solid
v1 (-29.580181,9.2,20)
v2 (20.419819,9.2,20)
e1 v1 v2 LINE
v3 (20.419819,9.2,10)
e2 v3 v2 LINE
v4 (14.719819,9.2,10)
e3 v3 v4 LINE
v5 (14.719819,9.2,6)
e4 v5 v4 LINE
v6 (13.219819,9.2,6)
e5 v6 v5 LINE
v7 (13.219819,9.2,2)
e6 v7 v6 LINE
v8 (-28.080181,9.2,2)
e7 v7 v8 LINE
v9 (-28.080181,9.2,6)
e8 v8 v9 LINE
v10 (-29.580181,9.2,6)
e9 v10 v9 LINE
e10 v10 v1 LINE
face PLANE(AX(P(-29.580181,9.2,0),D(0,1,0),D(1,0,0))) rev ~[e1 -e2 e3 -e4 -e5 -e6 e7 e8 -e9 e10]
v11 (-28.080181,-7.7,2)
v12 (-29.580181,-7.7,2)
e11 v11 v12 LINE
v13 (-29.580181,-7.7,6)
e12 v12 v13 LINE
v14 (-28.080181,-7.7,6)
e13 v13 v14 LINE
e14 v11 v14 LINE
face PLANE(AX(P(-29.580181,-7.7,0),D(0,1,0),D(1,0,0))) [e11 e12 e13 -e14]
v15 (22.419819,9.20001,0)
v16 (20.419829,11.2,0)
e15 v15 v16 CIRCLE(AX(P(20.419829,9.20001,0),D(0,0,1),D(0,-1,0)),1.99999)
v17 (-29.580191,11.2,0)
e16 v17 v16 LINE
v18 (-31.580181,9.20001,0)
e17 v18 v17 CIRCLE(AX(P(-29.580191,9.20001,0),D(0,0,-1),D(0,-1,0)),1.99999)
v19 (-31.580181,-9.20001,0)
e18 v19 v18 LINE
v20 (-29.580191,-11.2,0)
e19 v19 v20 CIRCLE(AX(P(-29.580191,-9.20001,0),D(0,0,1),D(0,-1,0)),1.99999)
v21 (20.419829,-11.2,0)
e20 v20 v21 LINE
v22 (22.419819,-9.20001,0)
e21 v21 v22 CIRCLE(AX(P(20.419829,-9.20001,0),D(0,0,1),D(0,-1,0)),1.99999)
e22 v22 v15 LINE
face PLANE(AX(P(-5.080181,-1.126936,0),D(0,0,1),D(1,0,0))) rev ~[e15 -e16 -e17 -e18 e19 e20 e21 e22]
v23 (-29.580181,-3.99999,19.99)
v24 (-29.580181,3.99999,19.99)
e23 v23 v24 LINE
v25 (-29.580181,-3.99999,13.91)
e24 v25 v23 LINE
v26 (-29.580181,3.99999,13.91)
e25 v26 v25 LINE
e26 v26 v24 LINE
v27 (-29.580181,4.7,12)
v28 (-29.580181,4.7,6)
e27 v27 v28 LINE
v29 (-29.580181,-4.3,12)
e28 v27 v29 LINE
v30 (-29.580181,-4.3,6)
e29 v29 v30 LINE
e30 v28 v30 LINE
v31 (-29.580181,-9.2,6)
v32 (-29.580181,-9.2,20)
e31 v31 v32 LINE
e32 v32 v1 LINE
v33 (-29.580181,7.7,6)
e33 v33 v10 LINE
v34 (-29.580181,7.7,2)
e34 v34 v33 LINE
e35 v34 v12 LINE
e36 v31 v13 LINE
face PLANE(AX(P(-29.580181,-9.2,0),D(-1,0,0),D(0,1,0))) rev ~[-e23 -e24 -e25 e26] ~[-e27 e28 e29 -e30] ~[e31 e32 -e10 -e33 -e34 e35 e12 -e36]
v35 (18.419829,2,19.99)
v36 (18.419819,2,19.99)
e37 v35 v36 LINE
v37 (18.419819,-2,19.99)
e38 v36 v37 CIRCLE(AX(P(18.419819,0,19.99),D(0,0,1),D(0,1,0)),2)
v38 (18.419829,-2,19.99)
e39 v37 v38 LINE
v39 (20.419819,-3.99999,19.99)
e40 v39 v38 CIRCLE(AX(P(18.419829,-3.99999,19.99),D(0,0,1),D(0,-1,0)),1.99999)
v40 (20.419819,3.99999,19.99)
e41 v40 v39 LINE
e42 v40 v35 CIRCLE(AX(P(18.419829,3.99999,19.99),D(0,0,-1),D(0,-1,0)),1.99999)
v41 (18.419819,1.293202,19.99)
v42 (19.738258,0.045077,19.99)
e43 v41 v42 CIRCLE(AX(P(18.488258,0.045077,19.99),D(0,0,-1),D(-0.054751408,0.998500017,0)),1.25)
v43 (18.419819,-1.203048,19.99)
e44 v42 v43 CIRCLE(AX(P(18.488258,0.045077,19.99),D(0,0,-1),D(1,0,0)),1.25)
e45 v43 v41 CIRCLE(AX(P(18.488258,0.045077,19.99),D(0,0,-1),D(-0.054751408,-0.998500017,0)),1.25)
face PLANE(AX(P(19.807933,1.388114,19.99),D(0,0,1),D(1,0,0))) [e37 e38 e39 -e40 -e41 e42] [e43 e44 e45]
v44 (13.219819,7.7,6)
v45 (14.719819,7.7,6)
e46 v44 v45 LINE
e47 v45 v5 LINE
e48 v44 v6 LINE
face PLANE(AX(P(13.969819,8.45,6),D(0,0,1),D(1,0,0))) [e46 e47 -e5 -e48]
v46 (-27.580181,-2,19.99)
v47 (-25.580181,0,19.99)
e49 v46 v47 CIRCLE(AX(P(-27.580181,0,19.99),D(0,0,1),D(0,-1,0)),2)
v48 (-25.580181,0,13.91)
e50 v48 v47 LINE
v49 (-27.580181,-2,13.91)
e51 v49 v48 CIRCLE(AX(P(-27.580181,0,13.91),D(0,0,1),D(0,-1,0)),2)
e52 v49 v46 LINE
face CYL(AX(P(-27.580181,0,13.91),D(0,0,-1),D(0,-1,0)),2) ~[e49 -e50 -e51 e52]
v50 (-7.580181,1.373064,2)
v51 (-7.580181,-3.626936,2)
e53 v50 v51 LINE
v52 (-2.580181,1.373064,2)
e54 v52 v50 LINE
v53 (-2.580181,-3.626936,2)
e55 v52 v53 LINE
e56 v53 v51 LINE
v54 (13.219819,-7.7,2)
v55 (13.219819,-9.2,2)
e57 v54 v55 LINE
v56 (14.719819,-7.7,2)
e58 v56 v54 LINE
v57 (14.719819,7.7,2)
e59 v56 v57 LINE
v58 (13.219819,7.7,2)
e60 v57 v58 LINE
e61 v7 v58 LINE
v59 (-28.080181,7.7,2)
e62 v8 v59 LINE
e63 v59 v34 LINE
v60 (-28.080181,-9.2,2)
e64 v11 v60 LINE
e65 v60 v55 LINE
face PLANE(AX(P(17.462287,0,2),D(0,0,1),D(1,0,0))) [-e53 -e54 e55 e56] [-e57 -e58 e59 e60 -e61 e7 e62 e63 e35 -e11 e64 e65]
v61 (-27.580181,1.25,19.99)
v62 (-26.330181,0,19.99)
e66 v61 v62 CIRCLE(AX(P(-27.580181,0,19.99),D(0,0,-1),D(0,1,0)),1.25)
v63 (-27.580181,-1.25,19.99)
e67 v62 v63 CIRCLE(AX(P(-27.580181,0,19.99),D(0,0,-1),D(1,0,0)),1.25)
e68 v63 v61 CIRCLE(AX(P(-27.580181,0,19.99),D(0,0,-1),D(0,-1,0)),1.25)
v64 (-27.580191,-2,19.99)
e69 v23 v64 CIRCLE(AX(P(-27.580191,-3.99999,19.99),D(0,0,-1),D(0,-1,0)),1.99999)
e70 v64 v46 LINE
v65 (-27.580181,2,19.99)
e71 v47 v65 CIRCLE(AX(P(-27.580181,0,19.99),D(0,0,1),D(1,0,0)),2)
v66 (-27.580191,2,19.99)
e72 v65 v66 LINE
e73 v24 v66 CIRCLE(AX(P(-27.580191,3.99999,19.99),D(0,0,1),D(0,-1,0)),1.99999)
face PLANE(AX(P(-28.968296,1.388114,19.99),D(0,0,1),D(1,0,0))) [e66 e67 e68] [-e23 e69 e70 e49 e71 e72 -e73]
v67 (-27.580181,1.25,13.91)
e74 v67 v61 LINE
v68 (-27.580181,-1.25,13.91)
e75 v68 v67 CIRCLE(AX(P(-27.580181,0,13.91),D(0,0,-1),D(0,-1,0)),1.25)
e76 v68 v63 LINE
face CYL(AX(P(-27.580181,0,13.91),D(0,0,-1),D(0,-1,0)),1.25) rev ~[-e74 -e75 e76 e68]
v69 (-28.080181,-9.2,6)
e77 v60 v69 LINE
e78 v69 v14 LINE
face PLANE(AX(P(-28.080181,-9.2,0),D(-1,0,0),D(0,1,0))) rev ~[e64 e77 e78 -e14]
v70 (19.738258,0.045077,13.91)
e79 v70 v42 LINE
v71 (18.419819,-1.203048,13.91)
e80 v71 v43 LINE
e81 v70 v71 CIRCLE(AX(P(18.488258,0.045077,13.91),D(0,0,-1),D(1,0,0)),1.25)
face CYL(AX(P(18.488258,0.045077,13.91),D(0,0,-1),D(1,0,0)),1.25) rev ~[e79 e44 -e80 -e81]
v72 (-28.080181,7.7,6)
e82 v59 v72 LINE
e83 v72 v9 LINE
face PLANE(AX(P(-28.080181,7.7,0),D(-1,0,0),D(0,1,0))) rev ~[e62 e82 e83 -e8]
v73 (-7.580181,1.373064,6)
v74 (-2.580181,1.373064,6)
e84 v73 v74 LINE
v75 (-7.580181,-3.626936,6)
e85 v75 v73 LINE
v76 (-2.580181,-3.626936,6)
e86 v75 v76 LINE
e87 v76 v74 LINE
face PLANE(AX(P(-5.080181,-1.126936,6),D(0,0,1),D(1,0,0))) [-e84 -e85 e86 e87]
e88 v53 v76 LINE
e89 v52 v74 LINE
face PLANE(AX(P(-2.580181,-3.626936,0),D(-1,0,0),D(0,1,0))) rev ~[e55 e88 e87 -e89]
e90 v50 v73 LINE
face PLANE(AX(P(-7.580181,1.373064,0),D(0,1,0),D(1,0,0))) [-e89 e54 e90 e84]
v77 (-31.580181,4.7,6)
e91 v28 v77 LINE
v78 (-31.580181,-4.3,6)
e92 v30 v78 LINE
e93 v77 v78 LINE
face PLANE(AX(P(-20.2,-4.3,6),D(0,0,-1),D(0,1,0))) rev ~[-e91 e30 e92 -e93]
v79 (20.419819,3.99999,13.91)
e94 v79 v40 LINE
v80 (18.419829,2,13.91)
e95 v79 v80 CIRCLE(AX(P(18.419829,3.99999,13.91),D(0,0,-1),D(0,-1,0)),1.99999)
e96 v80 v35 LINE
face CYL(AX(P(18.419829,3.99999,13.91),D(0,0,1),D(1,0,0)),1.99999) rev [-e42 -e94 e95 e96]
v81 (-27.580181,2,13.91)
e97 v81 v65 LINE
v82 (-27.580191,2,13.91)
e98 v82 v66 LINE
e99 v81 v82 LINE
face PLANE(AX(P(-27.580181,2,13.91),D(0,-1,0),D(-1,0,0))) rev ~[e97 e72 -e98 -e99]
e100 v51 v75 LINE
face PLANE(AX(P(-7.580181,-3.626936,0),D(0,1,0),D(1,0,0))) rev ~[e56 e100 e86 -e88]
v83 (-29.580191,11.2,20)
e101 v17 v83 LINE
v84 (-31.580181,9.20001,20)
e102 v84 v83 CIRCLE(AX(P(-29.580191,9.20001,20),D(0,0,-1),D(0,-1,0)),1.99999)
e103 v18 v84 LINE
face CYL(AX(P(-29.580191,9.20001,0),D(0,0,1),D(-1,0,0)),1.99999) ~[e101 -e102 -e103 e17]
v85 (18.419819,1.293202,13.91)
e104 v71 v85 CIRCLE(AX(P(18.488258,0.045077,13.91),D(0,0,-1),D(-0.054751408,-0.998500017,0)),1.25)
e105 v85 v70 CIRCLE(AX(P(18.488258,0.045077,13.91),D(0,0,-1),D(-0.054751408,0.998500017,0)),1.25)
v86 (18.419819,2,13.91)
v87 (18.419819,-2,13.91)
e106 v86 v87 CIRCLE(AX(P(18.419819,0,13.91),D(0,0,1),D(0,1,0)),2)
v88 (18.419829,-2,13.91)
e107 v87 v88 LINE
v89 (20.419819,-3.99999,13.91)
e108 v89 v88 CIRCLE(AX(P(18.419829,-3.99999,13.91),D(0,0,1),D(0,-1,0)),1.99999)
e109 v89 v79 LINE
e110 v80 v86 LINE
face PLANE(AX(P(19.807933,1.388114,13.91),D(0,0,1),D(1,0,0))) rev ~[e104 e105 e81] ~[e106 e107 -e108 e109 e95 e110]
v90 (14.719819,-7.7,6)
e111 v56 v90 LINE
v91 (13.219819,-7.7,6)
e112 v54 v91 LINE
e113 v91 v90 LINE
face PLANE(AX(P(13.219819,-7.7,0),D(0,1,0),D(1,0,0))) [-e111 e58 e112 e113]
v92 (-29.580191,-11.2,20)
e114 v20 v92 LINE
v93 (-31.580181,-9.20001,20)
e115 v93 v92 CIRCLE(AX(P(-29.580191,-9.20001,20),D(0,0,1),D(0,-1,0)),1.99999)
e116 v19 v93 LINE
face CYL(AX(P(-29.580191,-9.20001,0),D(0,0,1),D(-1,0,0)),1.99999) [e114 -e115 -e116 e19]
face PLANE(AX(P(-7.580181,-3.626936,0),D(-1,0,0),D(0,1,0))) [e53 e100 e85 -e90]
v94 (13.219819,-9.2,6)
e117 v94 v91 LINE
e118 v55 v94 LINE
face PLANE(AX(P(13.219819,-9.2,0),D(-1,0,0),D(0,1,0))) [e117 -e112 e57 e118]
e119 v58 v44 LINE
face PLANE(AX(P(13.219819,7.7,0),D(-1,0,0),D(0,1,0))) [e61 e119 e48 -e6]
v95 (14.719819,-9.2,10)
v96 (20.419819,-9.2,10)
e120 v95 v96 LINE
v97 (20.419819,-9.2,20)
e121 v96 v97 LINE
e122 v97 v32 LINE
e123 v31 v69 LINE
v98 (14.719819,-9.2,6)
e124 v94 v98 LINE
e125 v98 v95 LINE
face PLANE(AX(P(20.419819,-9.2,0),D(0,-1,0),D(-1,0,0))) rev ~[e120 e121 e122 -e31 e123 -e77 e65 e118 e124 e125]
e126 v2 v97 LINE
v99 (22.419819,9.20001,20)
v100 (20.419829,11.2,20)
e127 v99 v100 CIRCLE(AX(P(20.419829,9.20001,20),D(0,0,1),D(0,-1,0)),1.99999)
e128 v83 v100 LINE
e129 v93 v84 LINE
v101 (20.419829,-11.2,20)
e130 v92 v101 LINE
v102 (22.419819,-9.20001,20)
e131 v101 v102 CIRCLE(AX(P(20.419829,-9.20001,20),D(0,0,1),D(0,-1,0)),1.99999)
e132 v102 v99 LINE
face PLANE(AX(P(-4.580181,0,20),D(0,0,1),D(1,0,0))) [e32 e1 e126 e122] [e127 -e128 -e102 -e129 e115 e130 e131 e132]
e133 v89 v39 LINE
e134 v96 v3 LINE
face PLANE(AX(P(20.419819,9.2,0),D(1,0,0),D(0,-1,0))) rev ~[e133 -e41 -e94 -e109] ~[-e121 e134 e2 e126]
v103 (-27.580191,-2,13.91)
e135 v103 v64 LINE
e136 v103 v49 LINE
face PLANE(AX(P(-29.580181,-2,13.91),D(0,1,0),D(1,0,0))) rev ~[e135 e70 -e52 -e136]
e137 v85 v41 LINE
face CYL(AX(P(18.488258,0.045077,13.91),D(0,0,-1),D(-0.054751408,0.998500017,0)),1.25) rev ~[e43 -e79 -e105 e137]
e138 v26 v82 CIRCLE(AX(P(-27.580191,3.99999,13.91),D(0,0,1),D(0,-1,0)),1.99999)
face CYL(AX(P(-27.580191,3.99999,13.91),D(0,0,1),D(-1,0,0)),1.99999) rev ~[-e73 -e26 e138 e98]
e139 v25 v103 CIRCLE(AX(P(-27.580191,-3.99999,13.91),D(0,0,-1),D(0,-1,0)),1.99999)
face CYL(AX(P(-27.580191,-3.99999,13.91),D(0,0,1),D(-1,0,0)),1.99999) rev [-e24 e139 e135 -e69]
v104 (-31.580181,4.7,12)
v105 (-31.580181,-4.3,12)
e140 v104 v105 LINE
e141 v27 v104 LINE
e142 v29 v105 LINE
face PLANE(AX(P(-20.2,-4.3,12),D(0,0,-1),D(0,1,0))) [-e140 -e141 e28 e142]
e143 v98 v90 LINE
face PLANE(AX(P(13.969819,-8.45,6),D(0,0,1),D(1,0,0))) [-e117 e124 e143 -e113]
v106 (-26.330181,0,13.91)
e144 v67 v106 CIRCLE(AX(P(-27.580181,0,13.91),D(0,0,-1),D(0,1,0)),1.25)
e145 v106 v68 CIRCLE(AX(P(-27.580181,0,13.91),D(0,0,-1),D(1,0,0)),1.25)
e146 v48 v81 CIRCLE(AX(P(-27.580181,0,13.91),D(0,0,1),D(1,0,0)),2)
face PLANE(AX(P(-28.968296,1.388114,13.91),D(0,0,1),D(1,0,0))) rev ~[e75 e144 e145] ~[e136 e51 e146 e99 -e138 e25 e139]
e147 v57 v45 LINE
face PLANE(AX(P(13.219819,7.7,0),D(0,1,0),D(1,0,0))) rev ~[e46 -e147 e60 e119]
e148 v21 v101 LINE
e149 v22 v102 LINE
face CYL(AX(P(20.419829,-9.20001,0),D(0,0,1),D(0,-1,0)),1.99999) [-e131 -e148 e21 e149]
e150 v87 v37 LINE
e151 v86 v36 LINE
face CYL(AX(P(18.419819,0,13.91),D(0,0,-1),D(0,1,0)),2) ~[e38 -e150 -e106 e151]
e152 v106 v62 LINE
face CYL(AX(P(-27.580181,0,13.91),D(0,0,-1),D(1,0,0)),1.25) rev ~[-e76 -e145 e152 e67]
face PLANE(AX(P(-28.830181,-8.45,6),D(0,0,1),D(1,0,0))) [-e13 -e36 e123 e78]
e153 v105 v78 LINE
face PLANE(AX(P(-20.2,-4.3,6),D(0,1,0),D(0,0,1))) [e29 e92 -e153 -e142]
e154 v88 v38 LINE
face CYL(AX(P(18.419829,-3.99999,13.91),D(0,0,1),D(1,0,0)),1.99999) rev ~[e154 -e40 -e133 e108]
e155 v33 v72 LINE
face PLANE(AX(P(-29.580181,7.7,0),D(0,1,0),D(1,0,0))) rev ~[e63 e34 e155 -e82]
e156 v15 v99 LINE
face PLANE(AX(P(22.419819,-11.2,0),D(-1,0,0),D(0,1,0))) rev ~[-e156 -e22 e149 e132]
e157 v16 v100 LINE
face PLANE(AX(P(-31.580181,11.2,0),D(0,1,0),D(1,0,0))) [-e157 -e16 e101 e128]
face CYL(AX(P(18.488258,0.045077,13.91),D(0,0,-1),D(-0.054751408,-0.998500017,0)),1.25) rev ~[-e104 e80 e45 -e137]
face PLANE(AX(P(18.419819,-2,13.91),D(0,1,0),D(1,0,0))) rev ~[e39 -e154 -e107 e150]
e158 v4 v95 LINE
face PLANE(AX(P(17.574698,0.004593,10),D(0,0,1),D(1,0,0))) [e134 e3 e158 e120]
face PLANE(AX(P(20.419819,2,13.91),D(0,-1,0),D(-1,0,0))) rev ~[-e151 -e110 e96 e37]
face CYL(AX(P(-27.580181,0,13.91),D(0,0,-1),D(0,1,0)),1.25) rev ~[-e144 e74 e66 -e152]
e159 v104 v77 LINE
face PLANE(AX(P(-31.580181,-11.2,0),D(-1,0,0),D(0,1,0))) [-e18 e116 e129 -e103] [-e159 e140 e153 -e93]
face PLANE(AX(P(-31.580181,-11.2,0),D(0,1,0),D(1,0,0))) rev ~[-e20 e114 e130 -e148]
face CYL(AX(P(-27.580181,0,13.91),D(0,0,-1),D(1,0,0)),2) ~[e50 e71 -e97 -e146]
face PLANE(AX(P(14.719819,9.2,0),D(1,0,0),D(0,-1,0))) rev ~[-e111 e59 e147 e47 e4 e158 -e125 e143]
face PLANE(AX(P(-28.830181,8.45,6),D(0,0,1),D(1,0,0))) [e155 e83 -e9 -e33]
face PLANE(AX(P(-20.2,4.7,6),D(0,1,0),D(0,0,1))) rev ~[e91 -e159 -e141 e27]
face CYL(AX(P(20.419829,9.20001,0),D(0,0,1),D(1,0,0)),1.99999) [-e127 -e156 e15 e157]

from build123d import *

# Parameters (mm, degrees)
F0_W     = 54
F0_H     = 22.4
F1_DEPTH = 20
F0_W_2   = 5
F0_H_2   = 5
F0_W_3   = 1.5
F0_H_3   = 1.5
F2_DEPTH = 2
F4_START = -20.2
F3_W     = 9
F3_H     = 6
F4_DEPTH = 15.6
F5_DEPTH = 10
F6_START = 13.91
F6_DEPTH = 6.08
F7_R     = 1.99999
F8_DEPTH = 6


# Not quite as in the source:
# - a fillet or chamfer is up to 0.001 mm smaller than in the source, because OpenCascade refuses the exact size


with BuildPart() as f1:
    # F0 (on Top) → F1 (new body)
    with BuildSketch(Plane.XY):
        with Locations((-4.5801811367, 0)):
            Rectangle(F0_W, F0_H)
        Polygon((-29.5801811367, 7.7), (-29.5801811367, 9.2), (-28.0801811367, 9.2), (13.2198188633, 9.2), (14.7198188633, 9.2), (20.4198188633, 9.2), (20.4198188633, 2), (20.4198188633, 0), (20.4198188633, -2), (20.4198188633, -9.2), (14.7198188633, -9.2), (13.2198188633, -9.2), (-28.0801811367, -9.2), (-29.5801811367, -9.2), (-29.5801811367, -7.7), (-29.5801811367, -2), (-29.5801811367, 0), (-29.5801811367, 2), align=None, mode=Mode.SUBTRACT)
    extrude(amount=F1_DEPTH)

    # F0 (on Top) → F2 (join)
    with BuildSketch(Plane.XY):
        with BuildLine():
            Line((20.4198188633, 9.2), (14.7198188633, 9.2))
            Line((14.7198188633, 9.2), (14.7198188633, 7.7))
            Line((14.7198188633, 7.7), (14.7198188633, -7.7))
            Line((14.7198188633, -7.7), (14.7198188633, -9.2))
            Line((14.7198188633, -9.2), (20.4198188633, -9.2))
            Line((20.4198188633, -9.2), (20.4198188633, -2))
            Line((20.4198188633, -2), (18.4198188633, -2))
            ThreePointArc((18.4198188633, -2), (16.4198188633, 0), (18.4198188633, 2))
            Line((18.4198188633, 2), (20.4198188633, 2))
            Line((20.4198188633, 2), (20.4198188633, 9.2))
        make_face()
        with BuildLine():
            Line((13.2198188633, 9.2), (-28.0801811367, 9.2))
            Line((-28.0801811367, 9.2), (-28.0801811367, 7.7))
            Line((-28.0801811367, 7.7), (-29.5801811367, 7.7))
            Line((-29.5801811367, 7.7), (-29.5801811367, 2))
            Line((-29.5801811367, 2), (-27.5801811367, 2))
            ThreePointArc((-27.5801811367, 2), (-26.1659675744, 1.4142135624), (-25.5801811367, 0))
            ThreePointArc((-25.5801811367, 0), (-26.1659675744, -1.4142135624), (-27.5801811367, -2))
            Line((-27.5801811367, -2), (-29.5801811367, -2))
            Line((-29.5801811367, -2), (-29.5801811367, -7.7))
            Line((-29.5801811367, -7.7), (-28.0801811367, -7.7))
            Line((-28.0801811367, -7.7), (-28.0801811367, -9.2))
            Line((-28.0801811367, -9.2), (13.2198188633, -9.2))
            Line((13.2198188633, -9.2), (13.2198188633, -7.7))
            Line((13.2198188633, -7.7), (14.7198188633, -7.7))
            Line((14.7198188633, -7.7), (14.7198188633, 7.7))
            Line((14.7198188633, 7.7), (13.2198188633, 7.7))
            Line((13.2198188633, 7.7), (13.2198188633, 9.2))
        make_face()
        with Locations((-5.0801811367, -1.1269363482)):
            Rectangle(F0_W_2, F0_H_2, mode=Mode.SUBTRACT)
        with BuildLine():
            ThreePointArc((18.4198188633, -2), (19.8340324256, -1.4142135624), (20.4198188633, 0))
            ThreePointArc((20.4198188633, 0), (19.8340324256, 1.4142135624), (18.4198188633, 2))
            Line((18.4198188633, 2), (18.4198188633, 1.2932023613))
            ThreePointArc((18.4198188633, 1.2932023613), (19.3476040738, 0.9528353135), (19.7382581234, 0.0450773405))
            ThreePointArc((19.7382581234, 0.0450773405), (19.3476040738, -0.8626806325), (18.4198188633, -1.2030476804))
            Line((18.4198188633, -1.2030476804), (18.4198188633, -2))
        make_face()
        with BuildLine():
            Line((20.4198188633, 0), (20.4198188633, 2))
            Line((20.4198188633, 2), (18.4198188633, 2))
            ThreePointArc((18.4198188633, 2), (19.8340324256, 1.4142135624), (20.4198188633, 0))
        make_face()
        with BuildLine():
            Line((20.4198188633, -2), (20.4198188633, 0))
            ThreePointArc((20.4198188633, 0), (19.8340324256, -1.4142135624), (18.4198188633, -2))
            Line((18.4198188633, -2), (20.4198188633, -2))
        make_face()
        with BuildLine():
            Line((18.4198188633, 1.2932023613), (18.4198188633, 2))
            ThreePointArc((18.4198188633, 2), (16.4198188633, 0), (18.4198188633, -2))
            Line((18.4198188633, -2), (18.4198188633, -1.2030476804))
            ThreePointArc((18.4198188633, -1.2030476804), (17.2382581234, 0.0450773405), (18.4198188633, 1.2932023613))
        make_face()
        with BuildLine():
            Line((18.4198188633, -1.2030476804), (18.4198188633, 1.2932023613))
            ThreePointArc((18.4198188633, 1.2932023613), (17.2382581234, 0.0450773405), (18.4198188633, -1.2030476804))
        make_face()
        with BuildLine():
            ThreePointArc((19.7382581234, 0.0450773405), (19.3476040738, 0.9528353135), (18.4198188633, 1.2932023613))
            Line((18.4198188633, 1.2932023613), (18.4198188633, -1.2030476804))
            ThreePointArc((18.4198188633, -1.2030476804), (19.3476040738, -0.8626806325), (19.7382581234, 0.0450773405))
        make_face()
        with BuildLine():
            Line((-27.5801811367, 2), (-29.5801811367, 2))
            Line((-29.5801811367, 2), (-29.5801811367, 0))
            ThreePointArc((-29.5801811367, 0), (-28.9943946991, 1.4142135624), (-27.5801811367, 2))
        make_face()
        with BuildLine():
            ThreePointArc((-27.5801811367, -2), (-28.9943946991, -1.4142135624), (-29.5801811367, 0))
            Line((-29.5801811367, 0), (-29.5801811367, -2))
            Line((-29.5801811367, -2), (-27.5801811367, -2))
        make_face()
        with BuildLine():
            ThreePointArc((-27.5801811367, 2), (-28.9943946991, 1.4142135624), (-29.5801811367, 0))
            ThreePointArc((-29.5801811367, 0), (-28.9943946991, -1.4142135624), (-27.5801811367, -2))
            Line((-27.5801811367, -2), (-27.5801811367, -1.25))
            ThreePointArc((-27.5801811367, -1.25), (-28.8301811367, 0), (-27.5801811367, 1.25))
            Line((-27.5801811367, 1.25), (-27.5801811367, 2))
        make_face()
        with BuildLine():
            ThreePointArc((-25.5801811367, 0), (-26.1659675744, 1.4142135624), (-27.5801811367, 2))
            Line((-27.5801811367, 2), (-27.5801811367, 1.25))
            ThreePointArc((-27.5801811367, 1.25), (-26.6962976602, 0.8838834765), (-26.3301811367, 0))
            ThreePointArc((-26.3301811367, 0), (-26.6962976602, -0.8838834765), (-27.5801811367, -1.25))
            Line((-27.5801811367, -1.25), (-27.5801811367, -2))
            ThreePointArc((-27.5801811367, -2), (-26.1659675744, -1.4142135624), (-25.5801811367, 0))
        make_face()
        with BuildLine():
            ThreePointArc((-26.3301811367, 0), (-26.6962976602, 0.8838834765), (-27.5801811367, 1.25))
            Line((-27.5801811367, 1.25), (-27.5801811367, -1.25))
            ThreePointArc((-27.5801811367, -1.25), (-26.6962976602, -0.8838834765), (-26.3301811367, 0))
        make_face()
        with BuildLine():
            Line((-27.5801811367, -1.25), (-27.5801811367, 1.25))
            ThreePointArc((-27.5801811367, 1.25), (-28.8301811367, 0), (-27.5801811367, -1.25))
        make_face()
        with Locations((-5.0801811367, -1.1269363482)):
            Rectangle(F0_W_2, F0_H_2)
        with Locations((-28.8301811367, 8.45)):
            Rectangle(F0_W_3, F0_H_3)
        with Locations((-28.8301811367, -8.45)):
            Rectangle(F0_W_3, F0_H_3)
        with Locations((13.9698188633, 8.45)):
            Rectangle(F0_W_3, F0_H_3)
        with Locations((13.9698188633, -8.45)):
            Rectangle(F0_W_3, F0_H_3)
    extrude(amount=F2_DEPTH)

    # F3 (on Right) → F4 (cut)
    with BuildSketch(Plane.YZ.offset(F4_START)):
        with Locations((0.2, 9)):
            Rectangle(F3_W, F3_H)
    extrude(amount=-F4_DEPTH, mode=Mode.SUBTRACT)

    # F0 (on Top) → F5 (join)
    with BuildSketch(Plane.XY):
        with BuildLine():
            Line((18.4198188633, 1.2932023613), (18.4198188633, 2))
            ThreePointArc((18.4198188633, 2), (16.4198188633, 0), (18.4198188633, -2))
            Line((18.4198188633, -2), (18.4198188633, -1.2030476804))
            ThreePointArc((18.4198188633, -1.2030476804), (17.2382581234, 0.0450773405), (18.4198188633, 1.2932023613))
        make_face()
        with BuildLine():
            Line((18.4198188633, -1.2030476804), (18.4198188633, 1.2932023613))
            ThreePointArc((18.4198188633, 1.2932023613), (17.2382581234, 0.0450773405), (18.4198188633, -1.2030476804))
        make_face()
        with BuildLine():
            ThreePointArc((19.7382581234, 0.0450773405), (19.3476040738, 0.9528353135), (18.4198188633, 1.2932023613))
            Line((18.4198188633, 1.2932023613), (18.4198188633, -1.2030476804))
            ThreePointArc((18.4198188633, -1.2030476804), (19.3476040738, -0.8626806325), (19.7382581234, 0.0450773405))
        make_face()
        with BuildLine():
            ThreePointArc((18.4198188633, -2), (19.8340324256, -1.4142135624), (20.4198188633, 0))
            ThreePointArc((20.4198188633, 0), (19.8340324256, 1.4142135624), (18.4198188633, 2))
            Line((18.4198188633, 2), (18.4198188633, 1.2932023613))
            ThreePointArc((18.4198188633, 1.2932023613), (19.3476040738, 0.9528353135), (19.7382581234, 0.0450773405))
            ThreePointArc((19.7382581234, 0.0450773405), (19.3476040738, -0.8626806325), (18.4198188633, -1.2030476804))
            Line((18.4198188633, -1.2030476804), (18.4198188633, -2))
        make_face()
        with BuildLine():
            Line((20.4198188633, 0), (20.4198188633, 2))
            Line((20.4198188633, 2), (18.4198188633, 2))
            ThreePointArc((18.4198188633, 2), (19.8340324256, 1.4142135624), (20.4198188633, 0))
        make_face()
        with BuildLine():
            Line((20.4198188633, -2), (20.4198188633, 0))
            ThreePointArc((20.4198188633, 0), (19.8340324256, -1.4142135624), (18.4198188633, -2))
            Line((18.4198188633, -2), (20.4198188633, -2))
        make_face()
        with BuildLine():
            Line((20.4198188633, 9.2), (14.7198188633, 9.2))
            Line((14.7198188633, 9.2), (14.7198188633, 7.7))
            Line((14.7198188633, 7.7), (14.7198188633, -7.7))
            Line((14.7198188633, -7.7), (14.7198188633, -9.2))
            Line((14.7198188633, -9.2), (20.4198188633, -9.2))
            Line((20.4198188633, -9.2), (20.4198188633, -2))
            Line((20.4198188633, -2), (18.4198188633, -2))
            ThreePointArc((18.4198188633, -2), (16.4198188633, 0), (18.4198188633, 2))
            Line((18.4198188633, 2), (20.4198188633, 2))
            Line((20.4198188633, 2), (20.4198188633, 9.2))
        make_face()
    extrude(amount=F5_DEPTH)

    # F0 (on Top) → F6 (join)
    with BuildSketch(Plane.XY.offset(F6_START)):
        with BuildLine():
            Line((20.4198188633, 0), (20.4198188633, 2))
            Line((20.4198188633, 2), (18.4198188633, 2))
            ThreePointArc((18.4198188633, 2), (19.8340324256, 1.4142135624), (20.4198188633, 0))
        make_face()
        with BuildLine():
            ThreePointArc((18.4198188633, -2), (19.8340324256, -1.4142135624), (20.4198188633, 0))
            ThreePointArc((20.4198188633, 0), (19.8340324256, 1.4142135624), (18.4198188633, 2))
            Line((18.4198188633, 2), (18.4198188633, 1.2932023613))
            ThreePointArc((18.4198188633, 1.2932023613), (19.3476040738, 0.9528353135), (19.7382581234, 0.0450773405))
            ThreePointArc((19.7382581234, 0.0450773405), (19.3476040738, -0.8626806325), (18.4198188633, -1.2030476804))
            Line((18.4198188633, -1.2030476804), (18.4198188633, -2))
        make_face()
        with BuildLine():
            Line((20.4198188633, -2), (20.4198188633, 0))
            ThreePointArc((20.4198188633, 0), (19.8340324256, -1.4142135624), (18.4198188633, -2))
            Line((18.4198188633, -2), (20.4198188633, -2))
        make_face()
        with BuildLine():
            Line((18.4198188633, 1.2932023613), (18.4198188633, 2))
            ThreePointArc((18.4198188633, 2), (16.4198188633, 0), (18.4198188633, -2))
            Line((18.4198188633, -2), (18.4198188633, -1.2030476804))
            ThreePointArc((18.4198188633, -1.2030476804), (17.2382581234, 0.0450773405), (18.4198188633, 1.2932023613))
        make_face()
        with BuildLine():
            Line((-27.5801811367, 2), (-29.5801811367, 2))
            Line((-29.5801811367, 2), (-29.5801811367, 0))
            ThreePointArc((-29.5801811367, 0), (-28.9943946991, 1.4142135624), (-27.5801811367, 2))
        make_face()
        with BuildLine():
            ThreePointArc((-27.5801811367, 2), (-28.9943946991, 1.4142135624), (-29.5801811367, 0))
            ThreePointArc((-29.5801811367, 0), (-28.9943946991, -1.4142135624), (-27.5801811367, -2))
            Line((-27.5801811367, -2), (-27.5801811367, -1.25))
            ThreePointArc((-27.5801811367, -1.25), (-28.8301811367, 0), (-27.5801811367, 1.25))
            Line((-27.5801811367, 1.25), (-27.5801811367, 2))
        make_face()
        with BuildLine():
            ThreePointArc((-25.5801811367, 0), (-26.1659675744, 1.4142135624), (-27.5801811367, 2))
            Line((-27.5801811367, 2), (-27.5801811367, 1.25))
            ThreePointArc((-27.5801811367, 1.25), (-26.6962976602, 0.8838834765), (-26.3301811367, 0))
            ThreePointArc((-26.3301811367, 0), (-26.6962976602, -0.8838834765), (-27.5801811367, -1.25))
            Line((-27.5801811367, -1.25), (-27.5801811367, -2))
            ThreePointArc((-27.5801811367, -2), (-26.1659675744, -1.4142135624), (-25.5801811367, 0))
        make_face()
        with BuildLine():
            ThreePointArc((-27.5801811367, -2), (-28.9943946991, -1.4142135624), (-29.5801811367, 0))
            Line((-29.5801811367, 0), (-29.5801811367, -2))
            Line((-29.5801811367, -2), (-27.5801811367, -2))
        make_face()
    extrude(amount=F6_DEPTH)

    # F7 (radius 2 in the source; OpenCascade refuses exactly that, so slightly less here)
    f7_edges = [f1.edges().sort_by_distance(p)[0] for p in [
        (-31.580181, -11.2, 10),
        (-31.580181, 11.2, 10),
        (22.419819, 11.2, 10),
        (-29.580181, 2, 16.95),
        (-29.580181, -2, 16.95),
        (20.419819, -2, 16.95),
        (20.419819, 2, 16.95),
        (22.419819, -11.2, 10),
    ]]
    fillet(f7_edges, radius=F7_R)

    # F0 (on Top) → F8 (join)
    with BuildSketch(Plane.XY):
        with Locations((-5.0801811367, -1.1269363482)):
            Rectangle(F0_W_2, F0_H_2)
        with Locations((-28.8301811367, 8.45)):
            Rectangle(F0_W_3, F0_H_3)
        with Locations((-28.8301811367, -8.45)):
            Rectangle(F0_W_3, F0_H_3)
        with Locations((13.9698188633, 8.45)):
            Rectangle(F0_W_3, F0_H_3)
        with Locations((13.9698188633, -8.45)):
            Rectangle(F0_W_3, F0_H_3)
    extrude(amount=F8_DEPTH)


solid = f1.part
